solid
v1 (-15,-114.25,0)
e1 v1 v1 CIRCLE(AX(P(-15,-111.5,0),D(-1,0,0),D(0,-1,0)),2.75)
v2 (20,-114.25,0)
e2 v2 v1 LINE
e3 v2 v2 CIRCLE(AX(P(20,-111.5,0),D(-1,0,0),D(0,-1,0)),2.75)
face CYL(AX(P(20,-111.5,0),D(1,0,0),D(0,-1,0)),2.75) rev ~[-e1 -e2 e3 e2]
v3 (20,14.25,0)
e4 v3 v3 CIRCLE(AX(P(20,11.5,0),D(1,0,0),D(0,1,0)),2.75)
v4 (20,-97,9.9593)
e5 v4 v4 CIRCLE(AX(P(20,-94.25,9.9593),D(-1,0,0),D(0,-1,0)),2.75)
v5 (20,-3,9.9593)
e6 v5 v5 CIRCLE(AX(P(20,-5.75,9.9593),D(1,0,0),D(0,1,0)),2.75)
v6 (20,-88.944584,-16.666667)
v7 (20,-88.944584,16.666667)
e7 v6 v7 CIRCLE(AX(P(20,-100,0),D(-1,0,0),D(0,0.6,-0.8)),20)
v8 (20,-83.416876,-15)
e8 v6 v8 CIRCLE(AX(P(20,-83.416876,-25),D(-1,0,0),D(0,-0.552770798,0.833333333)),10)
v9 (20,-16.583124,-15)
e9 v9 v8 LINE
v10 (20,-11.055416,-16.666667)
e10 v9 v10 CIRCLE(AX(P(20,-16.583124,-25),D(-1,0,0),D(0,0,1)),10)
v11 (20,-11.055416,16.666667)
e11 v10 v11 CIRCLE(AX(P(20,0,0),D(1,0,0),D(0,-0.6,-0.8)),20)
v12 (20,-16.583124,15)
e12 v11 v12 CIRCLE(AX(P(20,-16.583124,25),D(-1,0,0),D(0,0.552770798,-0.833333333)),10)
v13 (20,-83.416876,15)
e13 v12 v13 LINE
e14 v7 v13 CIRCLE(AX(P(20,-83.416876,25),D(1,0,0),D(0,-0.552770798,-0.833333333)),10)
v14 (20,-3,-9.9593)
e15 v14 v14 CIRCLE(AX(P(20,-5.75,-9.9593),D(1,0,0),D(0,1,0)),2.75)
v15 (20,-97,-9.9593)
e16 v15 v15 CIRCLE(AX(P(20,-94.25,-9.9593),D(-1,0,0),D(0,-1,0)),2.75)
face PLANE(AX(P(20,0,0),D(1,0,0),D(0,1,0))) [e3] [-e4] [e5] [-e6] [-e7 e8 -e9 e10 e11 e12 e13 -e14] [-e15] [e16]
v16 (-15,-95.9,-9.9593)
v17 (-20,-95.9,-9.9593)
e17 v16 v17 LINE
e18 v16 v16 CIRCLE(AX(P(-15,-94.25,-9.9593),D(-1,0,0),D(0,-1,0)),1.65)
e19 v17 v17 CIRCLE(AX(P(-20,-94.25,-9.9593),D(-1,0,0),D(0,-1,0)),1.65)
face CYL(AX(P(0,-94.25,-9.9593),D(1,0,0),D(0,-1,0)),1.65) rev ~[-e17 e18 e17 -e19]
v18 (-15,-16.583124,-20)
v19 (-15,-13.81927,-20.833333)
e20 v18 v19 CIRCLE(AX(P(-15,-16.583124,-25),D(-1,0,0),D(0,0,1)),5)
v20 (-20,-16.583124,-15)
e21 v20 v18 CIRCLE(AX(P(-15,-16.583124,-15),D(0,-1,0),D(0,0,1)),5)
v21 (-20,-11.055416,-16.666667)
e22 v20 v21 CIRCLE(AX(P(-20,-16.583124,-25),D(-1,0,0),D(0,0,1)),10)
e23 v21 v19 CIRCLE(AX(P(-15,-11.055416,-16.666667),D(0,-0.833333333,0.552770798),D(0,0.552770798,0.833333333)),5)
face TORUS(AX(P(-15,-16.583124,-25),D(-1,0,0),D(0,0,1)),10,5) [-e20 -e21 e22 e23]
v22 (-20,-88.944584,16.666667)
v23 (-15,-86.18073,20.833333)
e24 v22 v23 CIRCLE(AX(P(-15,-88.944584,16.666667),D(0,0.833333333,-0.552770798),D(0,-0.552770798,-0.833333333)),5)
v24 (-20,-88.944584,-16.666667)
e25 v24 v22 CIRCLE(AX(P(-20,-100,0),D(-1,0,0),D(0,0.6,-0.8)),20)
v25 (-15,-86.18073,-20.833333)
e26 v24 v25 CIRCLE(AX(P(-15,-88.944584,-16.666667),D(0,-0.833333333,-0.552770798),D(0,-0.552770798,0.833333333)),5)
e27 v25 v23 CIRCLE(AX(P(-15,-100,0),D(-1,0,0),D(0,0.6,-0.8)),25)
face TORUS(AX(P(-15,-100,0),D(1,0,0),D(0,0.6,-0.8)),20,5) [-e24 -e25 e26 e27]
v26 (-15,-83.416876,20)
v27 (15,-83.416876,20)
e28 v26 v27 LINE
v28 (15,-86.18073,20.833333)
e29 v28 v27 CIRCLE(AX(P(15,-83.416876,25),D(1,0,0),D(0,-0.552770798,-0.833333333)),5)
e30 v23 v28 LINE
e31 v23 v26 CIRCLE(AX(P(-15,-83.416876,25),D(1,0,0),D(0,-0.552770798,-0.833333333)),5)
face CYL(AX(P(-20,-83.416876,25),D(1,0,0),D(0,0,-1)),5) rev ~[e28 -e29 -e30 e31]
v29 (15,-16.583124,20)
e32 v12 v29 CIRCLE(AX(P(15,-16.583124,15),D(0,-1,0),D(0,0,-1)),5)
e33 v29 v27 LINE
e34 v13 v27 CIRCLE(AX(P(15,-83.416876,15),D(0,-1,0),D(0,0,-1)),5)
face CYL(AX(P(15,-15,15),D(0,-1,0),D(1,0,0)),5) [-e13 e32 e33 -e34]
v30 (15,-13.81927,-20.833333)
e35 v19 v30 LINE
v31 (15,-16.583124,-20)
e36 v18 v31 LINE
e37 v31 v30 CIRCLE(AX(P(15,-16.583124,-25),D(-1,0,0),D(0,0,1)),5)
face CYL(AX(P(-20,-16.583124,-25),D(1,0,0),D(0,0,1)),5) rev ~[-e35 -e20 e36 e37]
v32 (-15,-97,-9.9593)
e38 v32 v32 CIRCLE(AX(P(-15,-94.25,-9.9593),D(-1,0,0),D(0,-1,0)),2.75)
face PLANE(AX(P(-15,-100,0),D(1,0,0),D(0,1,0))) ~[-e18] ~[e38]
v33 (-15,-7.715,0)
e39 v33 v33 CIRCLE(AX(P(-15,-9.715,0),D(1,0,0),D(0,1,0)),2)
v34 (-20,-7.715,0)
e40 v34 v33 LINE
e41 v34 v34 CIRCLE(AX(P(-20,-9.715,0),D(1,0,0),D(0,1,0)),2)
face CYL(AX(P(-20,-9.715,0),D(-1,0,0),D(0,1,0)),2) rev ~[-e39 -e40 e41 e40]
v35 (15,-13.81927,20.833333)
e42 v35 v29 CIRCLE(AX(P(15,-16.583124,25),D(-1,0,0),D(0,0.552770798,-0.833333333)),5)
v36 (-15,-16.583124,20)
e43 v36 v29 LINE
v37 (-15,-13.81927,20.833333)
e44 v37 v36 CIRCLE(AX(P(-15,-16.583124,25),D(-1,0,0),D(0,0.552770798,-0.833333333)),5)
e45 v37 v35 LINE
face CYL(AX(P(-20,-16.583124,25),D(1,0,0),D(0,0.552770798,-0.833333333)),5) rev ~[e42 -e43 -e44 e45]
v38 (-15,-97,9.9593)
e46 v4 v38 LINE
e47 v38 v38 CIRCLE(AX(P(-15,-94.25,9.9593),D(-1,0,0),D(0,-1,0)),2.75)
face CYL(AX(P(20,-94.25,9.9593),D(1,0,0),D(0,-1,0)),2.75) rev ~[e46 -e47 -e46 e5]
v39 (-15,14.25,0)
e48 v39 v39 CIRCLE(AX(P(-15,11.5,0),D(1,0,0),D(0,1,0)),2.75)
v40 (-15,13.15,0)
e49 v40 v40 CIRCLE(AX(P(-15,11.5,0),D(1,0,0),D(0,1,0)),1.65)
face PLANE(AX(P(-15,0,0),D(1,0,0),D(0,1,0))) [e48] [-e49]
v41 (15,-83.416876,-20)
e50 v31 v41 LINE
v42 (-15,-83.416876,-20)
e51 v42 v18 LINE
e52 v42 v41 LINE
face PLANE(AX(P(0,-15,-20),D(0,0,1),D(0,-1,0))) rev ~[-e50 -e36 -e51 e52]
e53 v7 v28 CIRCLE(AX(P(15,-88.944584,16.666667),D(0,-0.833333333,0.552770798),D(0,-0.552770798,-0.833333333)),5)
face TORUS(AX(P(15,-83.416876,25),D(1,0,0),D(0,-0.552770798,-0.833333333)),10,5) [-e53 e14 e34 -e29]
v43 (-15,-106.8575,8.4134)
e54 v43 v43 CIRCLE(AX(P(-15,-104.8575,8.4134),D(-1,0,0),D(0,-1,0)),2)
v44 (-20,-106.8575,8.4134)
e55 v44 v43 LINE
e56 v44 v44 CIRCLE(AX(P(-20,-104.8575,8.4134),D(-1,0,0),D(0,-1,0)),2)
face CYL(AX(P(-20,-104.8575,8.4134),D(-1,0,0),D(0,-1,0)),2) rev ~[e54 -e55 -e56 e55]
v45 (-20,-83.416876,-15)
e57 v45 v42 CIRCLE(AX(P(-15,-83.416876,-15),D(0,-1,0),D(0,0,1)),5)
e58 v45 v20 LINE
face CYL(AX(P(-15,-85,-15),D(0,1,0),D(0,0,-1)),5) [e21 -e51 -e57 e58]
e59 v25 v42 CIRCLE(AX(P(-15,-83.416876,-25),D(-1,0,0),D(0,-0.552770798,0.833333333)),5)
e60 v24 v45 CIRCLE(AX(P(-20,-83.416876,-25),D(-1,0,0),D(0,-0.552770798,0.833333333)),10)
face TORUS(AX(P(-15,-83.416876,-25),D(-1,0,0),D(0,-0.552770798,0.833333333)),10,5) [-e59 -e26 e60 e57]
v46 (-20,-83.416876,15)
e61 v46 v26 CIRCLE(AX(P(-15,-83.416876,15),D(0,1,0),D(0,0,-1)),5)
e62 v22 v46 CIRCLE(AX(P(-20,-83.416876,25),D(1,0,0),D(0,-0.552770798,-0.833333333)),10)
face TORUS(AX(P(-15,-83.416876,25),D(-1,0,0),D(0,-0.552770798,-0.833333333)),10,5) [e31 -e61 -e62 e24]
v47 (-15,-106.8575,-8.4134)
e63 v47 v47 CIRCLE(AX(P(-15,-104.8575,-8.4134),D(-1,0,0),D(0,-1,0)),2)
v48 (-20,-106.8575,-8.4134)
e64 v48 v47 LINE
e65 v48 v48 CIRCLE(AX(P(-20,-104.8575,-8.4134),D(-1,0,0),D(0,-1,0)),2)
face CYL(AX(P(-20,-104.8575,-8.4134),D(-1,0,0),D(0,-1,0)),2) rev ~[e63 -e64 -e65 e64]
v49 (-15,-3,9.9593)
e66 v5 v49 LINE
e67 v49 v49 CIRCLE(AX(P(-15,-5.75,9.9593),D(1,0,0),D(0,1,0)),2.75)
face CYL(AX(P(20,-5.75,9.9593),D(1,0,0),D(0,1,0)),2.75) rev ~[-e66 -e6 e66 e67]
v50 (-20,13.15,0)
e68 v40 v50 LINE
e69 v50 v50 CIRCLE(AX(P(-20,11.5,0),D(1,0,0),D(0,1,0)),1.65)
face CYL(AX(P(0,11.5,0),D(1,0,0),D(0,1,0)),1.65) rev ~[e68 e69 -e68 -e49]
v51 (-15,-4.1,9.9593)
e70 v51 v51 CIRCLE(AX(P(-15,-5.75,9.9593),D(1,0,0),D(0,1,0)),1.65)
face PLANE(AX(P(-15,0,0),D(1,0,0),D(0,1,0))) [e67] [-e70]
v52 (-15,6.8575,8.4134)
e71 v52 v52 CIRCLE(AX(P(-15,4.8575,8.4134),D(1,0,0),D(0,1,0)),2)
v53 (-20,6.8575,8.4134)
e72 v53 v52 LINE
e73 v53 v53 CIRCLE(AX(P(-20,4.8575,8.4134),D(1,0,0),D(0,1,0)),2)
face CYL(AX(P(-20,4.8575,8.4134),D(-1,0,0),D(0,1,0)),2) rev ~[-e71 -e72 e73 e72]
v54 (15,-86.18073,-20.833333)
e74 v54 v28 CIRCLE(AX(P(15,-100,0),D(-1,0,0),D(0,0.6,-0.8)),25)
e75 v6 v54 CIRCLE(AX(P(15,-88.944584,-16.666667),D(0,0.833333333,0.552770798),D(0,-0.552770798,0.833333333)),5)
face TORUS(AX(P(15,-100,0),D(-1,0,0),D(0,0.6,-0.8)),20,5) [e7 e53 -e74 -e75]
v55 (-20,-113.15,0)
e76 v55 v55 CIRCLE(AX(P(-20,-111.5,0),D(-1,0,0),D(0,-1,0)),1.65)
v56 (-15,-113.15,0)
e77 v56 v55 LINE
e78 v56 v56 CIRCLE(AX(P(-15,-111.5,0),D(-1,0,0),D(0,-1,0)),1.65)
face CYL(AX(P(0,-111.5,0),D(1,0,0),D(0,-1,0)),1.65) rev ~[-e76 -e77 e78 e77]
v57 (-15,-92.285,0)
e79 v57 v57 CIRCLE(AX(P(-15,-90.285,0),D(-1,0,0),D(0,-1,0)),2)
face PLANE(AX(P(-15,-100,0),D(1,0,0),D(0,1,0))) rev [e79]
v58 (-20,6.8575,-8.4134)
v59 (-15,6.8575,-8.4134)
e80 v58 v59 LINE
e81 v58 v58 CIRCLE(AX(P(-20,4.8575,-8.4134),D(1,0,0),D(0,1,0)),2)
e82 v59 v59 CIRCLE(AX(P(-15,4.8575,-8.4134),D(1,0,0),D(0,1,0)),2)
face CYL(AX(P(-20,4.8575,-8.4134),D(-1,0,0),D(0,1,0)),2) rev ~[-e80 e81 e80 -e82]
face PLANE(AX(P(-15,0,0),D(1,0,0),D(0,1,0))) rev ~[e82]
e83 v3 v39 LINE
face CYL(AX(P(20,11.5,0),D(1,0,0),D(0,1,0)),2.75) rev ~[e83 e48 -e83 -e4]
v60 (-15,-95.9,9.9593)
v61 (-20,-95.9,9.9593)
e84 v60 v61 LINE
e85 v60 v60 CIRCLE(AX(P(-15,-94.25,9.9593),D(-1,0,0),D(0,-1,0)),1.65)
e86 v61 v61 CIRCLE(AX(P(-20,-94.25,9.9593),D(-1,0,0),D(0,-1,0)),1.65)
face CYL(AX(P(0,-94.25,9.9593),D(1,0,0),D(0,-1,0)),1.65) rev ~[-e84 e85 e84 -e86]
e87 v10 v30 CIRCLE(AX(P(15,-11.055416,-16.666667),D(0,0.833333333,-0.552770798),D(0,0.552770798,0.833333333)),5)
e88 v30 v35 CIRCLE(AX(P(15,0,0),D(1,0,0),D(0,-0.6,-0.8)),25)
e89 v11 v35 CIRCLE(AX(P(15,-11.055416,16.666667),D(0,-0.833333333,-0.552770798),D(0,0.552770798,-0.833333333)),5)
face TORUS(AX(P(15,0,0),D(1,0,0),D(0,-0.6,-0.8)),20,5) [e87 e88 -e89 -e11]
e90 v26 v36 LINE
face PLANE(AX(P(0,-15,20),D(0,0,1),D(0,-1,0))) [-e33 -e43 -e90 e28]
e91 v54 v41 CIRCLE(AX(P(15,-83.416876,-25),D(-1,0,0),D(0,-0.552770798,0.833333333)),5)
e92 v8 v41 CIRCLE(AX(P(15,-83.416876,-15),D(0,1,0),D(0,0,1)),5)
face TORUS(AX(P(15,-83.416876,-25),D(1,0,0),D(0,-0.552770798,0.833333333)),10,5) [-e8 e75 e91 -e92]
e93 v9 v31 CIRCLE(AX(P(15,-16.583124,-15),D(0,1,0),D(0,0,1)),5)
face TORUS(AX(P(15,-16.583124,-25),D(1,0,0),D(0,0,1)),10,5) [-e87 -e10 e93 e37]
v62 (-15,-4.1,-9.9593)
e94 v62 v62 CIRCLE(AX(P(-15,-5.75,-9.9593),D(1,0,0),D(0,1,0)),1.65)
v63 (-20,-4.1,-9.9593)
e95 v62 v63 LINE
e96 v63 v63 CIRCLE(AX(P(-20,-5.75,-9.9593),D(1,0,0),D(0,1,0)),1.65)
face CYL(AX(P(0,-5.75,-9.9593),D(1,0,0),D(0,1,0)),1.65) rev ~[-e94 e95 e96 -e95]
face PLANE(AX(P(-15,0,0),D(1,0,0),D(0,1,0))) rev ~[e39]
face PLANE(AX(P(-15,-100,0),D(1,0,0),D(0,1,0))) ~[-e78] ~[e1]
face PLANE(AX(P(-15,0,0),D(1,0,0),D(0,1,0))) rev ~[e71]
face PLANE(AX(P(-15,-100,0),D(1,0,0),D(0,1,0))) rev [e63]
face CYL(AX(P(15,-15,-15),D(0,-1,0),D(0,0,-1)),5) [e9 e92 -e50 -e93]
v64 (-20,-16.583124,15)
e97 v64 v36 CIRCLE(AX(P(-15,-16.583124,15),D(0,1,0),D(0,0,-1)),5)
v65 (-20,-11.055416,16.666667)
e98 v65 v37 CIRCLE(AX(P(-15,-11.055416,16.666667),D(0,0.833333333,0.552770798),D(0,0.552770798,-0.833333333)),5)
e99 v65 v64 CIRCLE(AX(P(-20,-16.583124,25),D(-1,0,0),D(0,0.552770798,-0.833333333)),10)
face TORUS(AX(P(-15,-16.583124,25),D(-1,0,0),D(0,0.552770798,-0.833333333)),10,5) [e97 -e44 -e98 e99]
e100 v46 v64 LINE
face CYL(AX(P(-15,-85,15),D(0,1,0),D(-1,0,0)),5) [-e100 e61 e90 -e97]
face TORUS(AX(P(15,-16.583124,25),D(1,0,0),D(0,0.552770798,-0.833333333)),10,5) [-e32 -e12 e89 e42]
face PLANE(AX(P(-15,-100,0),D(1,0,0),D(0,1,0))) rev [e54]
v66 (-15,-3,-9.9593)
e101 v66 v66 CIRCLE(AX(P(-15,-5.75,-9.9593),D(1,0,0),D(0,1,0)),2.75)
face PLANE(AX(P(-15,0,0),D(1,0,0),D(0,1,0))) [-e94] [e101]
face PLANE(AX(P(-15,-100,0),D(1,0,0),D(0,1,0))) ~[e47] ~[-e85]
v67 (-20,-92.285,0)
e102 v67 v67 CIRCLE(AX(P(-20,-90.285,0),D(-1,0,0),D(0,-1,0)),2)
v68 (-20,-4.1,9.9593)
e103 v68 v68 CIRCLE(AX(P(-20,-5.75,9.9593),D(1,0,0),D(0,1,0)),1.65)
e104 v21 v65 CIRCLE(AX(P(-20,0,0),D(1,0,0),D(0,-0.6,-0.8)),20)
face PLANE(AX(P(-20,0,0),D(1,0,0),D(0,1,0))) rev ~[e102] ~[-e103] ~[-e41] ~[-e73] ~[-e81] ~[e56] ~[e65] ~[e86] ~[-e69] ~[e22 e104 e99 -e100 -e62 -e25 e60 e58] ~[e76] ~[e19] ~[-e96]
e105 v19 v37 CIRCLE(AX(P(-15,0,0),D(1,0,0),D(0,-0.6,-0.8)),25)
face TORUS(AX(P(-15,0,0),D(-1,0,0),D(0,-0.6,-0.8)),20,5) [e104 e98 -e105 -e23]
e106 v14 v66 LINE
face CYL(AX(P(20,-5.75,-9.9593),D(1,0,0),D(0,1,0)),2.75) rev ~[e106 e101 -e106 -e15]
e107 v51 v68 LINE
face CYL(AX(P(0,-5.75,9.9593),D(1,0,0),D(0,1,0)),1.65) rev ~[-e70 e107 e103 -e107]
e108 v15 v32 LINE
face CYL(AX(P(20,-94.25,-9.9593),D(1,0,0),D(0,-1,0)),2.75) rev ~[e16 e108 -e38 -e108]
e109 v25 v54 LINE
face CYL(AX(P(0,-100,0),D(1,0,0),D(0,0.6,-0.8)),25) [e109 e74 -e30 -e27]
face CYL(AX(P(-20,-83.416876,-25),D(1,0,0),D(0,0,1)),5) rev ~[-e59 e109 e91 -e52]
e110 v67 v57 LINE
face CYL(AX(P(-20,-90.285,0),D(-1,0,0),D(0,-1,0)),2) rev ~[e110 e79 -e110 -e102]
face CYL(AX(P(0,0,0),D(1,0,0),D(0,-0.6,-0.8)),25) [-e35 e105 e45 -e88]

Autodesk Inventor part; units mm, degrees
ref_plane "YZ Plane" through (0, 0, 0) normal (1, 0, 0) x (0, 1, 0)
ref_plane "XZ Plane" through (0, 0, 0) normal (0, 1, 0) x (-1, 0, 0)
sketch "Sketch1" plane through (0, 0, 0) normal (1, 0, 0) x (0, 1, 0)
  arc A0 (-15, -20) -> (-15, 20) centre (0, 0) ccw
  line L0 (-15, 20) -> (-50, 20)
  line L1 (-15, -20) -> (-50, -20)
  circle A1 centre (0, 0) radius 11.5 construction
  line L2 (25, 0) -> (0, 0) construction
  line L3 (0, 0) -> (-7.125, 12.3409) construction
  line L4 (0, 0) -> (-7.125, -12.3409) construction
  line L5 (-15, 20) -> (-15, -20) construction
  circle A2 centre (11.5, 0) radius 1.65
  circle A3 centre (-5.75, 9.9593) radius 1.65
  circle A4 centre (-5.75, -9.9593) radius 1.65
  circle A5 centre (11.5, 0) radius 2.75
  circle A6 centre (-5.75, -9.9593) radius 2.75
  circle A7 centre (-5.75, 9.9593) radius 2.75
  line L6 (0, 0) -> (5.8575, 10.1455) construction
  line L7 (0, 0) -> (5.8575, -10.1455) construction
  circle A8 centre (0, 0) radius 9.715 construction
  circle A9 centre (4.8575, 8.4134) radius 2
  circle A10 centre (4.8575, -8.4134) radius 2
  circle A11 centre (-9.715, 0) radius 2
  line L8 (-50, 20) -> (-50, -20) construction
  line L9 (-50, -20) -> (-50, 20)
  line L10 (0, 25) -> (0, -25) construction
  point P0 (-15, 0)
  dimension "d6" = 4
  dimension "d0" = 23
  dimension "d1" = 30
  dimension "d2" = 3.3
  dimension "d3" = 5.5
  dimension "d4" = 30
  dimension "d5" = 19.43
  dimension "d7" = 50
  dimension "d18" = 50
  dimension "d19" = 40
extrude "Extrusion1" add sketch "Sketch1" along normal mid plane 40 contours L1 L9 L0 A0 | A5 | A6 | A7 | A9 | A10 | A11
extrude "Extrusion2" cut sketch "Sketch1" against normal blind 35 from surface at 20 contours A5 | A6 | A7
extrude "Extrusion3" cut sketch "Sketch1" along normal blind 5 from surface at -20 contours A9 | A10 | A11
ref_plane "Work Plane1" through (0, -50, 20) normal (0, -1, 0) x (0, 0, -1)
mirror "Mirror1" about plane through (0, -50, 20) normal (0, -1, 0)
fillet "Fillet1" radius 5 12 edges at (-20, -125, 0) (-20, -50, -20) (-20, 25, 0) (-20, -50, 20) (20, -125, 0) (20, -50, -20) (20, 25, 0) (20, -50, 20) (0, -15, 20) (0, -85, 20) (0, -85, -20) (0, -15, -20)
equation "\"d18\" = 0.5 * thigh_length"
equation "\"thigh_length\" = 100"
properties part number "thigh"
